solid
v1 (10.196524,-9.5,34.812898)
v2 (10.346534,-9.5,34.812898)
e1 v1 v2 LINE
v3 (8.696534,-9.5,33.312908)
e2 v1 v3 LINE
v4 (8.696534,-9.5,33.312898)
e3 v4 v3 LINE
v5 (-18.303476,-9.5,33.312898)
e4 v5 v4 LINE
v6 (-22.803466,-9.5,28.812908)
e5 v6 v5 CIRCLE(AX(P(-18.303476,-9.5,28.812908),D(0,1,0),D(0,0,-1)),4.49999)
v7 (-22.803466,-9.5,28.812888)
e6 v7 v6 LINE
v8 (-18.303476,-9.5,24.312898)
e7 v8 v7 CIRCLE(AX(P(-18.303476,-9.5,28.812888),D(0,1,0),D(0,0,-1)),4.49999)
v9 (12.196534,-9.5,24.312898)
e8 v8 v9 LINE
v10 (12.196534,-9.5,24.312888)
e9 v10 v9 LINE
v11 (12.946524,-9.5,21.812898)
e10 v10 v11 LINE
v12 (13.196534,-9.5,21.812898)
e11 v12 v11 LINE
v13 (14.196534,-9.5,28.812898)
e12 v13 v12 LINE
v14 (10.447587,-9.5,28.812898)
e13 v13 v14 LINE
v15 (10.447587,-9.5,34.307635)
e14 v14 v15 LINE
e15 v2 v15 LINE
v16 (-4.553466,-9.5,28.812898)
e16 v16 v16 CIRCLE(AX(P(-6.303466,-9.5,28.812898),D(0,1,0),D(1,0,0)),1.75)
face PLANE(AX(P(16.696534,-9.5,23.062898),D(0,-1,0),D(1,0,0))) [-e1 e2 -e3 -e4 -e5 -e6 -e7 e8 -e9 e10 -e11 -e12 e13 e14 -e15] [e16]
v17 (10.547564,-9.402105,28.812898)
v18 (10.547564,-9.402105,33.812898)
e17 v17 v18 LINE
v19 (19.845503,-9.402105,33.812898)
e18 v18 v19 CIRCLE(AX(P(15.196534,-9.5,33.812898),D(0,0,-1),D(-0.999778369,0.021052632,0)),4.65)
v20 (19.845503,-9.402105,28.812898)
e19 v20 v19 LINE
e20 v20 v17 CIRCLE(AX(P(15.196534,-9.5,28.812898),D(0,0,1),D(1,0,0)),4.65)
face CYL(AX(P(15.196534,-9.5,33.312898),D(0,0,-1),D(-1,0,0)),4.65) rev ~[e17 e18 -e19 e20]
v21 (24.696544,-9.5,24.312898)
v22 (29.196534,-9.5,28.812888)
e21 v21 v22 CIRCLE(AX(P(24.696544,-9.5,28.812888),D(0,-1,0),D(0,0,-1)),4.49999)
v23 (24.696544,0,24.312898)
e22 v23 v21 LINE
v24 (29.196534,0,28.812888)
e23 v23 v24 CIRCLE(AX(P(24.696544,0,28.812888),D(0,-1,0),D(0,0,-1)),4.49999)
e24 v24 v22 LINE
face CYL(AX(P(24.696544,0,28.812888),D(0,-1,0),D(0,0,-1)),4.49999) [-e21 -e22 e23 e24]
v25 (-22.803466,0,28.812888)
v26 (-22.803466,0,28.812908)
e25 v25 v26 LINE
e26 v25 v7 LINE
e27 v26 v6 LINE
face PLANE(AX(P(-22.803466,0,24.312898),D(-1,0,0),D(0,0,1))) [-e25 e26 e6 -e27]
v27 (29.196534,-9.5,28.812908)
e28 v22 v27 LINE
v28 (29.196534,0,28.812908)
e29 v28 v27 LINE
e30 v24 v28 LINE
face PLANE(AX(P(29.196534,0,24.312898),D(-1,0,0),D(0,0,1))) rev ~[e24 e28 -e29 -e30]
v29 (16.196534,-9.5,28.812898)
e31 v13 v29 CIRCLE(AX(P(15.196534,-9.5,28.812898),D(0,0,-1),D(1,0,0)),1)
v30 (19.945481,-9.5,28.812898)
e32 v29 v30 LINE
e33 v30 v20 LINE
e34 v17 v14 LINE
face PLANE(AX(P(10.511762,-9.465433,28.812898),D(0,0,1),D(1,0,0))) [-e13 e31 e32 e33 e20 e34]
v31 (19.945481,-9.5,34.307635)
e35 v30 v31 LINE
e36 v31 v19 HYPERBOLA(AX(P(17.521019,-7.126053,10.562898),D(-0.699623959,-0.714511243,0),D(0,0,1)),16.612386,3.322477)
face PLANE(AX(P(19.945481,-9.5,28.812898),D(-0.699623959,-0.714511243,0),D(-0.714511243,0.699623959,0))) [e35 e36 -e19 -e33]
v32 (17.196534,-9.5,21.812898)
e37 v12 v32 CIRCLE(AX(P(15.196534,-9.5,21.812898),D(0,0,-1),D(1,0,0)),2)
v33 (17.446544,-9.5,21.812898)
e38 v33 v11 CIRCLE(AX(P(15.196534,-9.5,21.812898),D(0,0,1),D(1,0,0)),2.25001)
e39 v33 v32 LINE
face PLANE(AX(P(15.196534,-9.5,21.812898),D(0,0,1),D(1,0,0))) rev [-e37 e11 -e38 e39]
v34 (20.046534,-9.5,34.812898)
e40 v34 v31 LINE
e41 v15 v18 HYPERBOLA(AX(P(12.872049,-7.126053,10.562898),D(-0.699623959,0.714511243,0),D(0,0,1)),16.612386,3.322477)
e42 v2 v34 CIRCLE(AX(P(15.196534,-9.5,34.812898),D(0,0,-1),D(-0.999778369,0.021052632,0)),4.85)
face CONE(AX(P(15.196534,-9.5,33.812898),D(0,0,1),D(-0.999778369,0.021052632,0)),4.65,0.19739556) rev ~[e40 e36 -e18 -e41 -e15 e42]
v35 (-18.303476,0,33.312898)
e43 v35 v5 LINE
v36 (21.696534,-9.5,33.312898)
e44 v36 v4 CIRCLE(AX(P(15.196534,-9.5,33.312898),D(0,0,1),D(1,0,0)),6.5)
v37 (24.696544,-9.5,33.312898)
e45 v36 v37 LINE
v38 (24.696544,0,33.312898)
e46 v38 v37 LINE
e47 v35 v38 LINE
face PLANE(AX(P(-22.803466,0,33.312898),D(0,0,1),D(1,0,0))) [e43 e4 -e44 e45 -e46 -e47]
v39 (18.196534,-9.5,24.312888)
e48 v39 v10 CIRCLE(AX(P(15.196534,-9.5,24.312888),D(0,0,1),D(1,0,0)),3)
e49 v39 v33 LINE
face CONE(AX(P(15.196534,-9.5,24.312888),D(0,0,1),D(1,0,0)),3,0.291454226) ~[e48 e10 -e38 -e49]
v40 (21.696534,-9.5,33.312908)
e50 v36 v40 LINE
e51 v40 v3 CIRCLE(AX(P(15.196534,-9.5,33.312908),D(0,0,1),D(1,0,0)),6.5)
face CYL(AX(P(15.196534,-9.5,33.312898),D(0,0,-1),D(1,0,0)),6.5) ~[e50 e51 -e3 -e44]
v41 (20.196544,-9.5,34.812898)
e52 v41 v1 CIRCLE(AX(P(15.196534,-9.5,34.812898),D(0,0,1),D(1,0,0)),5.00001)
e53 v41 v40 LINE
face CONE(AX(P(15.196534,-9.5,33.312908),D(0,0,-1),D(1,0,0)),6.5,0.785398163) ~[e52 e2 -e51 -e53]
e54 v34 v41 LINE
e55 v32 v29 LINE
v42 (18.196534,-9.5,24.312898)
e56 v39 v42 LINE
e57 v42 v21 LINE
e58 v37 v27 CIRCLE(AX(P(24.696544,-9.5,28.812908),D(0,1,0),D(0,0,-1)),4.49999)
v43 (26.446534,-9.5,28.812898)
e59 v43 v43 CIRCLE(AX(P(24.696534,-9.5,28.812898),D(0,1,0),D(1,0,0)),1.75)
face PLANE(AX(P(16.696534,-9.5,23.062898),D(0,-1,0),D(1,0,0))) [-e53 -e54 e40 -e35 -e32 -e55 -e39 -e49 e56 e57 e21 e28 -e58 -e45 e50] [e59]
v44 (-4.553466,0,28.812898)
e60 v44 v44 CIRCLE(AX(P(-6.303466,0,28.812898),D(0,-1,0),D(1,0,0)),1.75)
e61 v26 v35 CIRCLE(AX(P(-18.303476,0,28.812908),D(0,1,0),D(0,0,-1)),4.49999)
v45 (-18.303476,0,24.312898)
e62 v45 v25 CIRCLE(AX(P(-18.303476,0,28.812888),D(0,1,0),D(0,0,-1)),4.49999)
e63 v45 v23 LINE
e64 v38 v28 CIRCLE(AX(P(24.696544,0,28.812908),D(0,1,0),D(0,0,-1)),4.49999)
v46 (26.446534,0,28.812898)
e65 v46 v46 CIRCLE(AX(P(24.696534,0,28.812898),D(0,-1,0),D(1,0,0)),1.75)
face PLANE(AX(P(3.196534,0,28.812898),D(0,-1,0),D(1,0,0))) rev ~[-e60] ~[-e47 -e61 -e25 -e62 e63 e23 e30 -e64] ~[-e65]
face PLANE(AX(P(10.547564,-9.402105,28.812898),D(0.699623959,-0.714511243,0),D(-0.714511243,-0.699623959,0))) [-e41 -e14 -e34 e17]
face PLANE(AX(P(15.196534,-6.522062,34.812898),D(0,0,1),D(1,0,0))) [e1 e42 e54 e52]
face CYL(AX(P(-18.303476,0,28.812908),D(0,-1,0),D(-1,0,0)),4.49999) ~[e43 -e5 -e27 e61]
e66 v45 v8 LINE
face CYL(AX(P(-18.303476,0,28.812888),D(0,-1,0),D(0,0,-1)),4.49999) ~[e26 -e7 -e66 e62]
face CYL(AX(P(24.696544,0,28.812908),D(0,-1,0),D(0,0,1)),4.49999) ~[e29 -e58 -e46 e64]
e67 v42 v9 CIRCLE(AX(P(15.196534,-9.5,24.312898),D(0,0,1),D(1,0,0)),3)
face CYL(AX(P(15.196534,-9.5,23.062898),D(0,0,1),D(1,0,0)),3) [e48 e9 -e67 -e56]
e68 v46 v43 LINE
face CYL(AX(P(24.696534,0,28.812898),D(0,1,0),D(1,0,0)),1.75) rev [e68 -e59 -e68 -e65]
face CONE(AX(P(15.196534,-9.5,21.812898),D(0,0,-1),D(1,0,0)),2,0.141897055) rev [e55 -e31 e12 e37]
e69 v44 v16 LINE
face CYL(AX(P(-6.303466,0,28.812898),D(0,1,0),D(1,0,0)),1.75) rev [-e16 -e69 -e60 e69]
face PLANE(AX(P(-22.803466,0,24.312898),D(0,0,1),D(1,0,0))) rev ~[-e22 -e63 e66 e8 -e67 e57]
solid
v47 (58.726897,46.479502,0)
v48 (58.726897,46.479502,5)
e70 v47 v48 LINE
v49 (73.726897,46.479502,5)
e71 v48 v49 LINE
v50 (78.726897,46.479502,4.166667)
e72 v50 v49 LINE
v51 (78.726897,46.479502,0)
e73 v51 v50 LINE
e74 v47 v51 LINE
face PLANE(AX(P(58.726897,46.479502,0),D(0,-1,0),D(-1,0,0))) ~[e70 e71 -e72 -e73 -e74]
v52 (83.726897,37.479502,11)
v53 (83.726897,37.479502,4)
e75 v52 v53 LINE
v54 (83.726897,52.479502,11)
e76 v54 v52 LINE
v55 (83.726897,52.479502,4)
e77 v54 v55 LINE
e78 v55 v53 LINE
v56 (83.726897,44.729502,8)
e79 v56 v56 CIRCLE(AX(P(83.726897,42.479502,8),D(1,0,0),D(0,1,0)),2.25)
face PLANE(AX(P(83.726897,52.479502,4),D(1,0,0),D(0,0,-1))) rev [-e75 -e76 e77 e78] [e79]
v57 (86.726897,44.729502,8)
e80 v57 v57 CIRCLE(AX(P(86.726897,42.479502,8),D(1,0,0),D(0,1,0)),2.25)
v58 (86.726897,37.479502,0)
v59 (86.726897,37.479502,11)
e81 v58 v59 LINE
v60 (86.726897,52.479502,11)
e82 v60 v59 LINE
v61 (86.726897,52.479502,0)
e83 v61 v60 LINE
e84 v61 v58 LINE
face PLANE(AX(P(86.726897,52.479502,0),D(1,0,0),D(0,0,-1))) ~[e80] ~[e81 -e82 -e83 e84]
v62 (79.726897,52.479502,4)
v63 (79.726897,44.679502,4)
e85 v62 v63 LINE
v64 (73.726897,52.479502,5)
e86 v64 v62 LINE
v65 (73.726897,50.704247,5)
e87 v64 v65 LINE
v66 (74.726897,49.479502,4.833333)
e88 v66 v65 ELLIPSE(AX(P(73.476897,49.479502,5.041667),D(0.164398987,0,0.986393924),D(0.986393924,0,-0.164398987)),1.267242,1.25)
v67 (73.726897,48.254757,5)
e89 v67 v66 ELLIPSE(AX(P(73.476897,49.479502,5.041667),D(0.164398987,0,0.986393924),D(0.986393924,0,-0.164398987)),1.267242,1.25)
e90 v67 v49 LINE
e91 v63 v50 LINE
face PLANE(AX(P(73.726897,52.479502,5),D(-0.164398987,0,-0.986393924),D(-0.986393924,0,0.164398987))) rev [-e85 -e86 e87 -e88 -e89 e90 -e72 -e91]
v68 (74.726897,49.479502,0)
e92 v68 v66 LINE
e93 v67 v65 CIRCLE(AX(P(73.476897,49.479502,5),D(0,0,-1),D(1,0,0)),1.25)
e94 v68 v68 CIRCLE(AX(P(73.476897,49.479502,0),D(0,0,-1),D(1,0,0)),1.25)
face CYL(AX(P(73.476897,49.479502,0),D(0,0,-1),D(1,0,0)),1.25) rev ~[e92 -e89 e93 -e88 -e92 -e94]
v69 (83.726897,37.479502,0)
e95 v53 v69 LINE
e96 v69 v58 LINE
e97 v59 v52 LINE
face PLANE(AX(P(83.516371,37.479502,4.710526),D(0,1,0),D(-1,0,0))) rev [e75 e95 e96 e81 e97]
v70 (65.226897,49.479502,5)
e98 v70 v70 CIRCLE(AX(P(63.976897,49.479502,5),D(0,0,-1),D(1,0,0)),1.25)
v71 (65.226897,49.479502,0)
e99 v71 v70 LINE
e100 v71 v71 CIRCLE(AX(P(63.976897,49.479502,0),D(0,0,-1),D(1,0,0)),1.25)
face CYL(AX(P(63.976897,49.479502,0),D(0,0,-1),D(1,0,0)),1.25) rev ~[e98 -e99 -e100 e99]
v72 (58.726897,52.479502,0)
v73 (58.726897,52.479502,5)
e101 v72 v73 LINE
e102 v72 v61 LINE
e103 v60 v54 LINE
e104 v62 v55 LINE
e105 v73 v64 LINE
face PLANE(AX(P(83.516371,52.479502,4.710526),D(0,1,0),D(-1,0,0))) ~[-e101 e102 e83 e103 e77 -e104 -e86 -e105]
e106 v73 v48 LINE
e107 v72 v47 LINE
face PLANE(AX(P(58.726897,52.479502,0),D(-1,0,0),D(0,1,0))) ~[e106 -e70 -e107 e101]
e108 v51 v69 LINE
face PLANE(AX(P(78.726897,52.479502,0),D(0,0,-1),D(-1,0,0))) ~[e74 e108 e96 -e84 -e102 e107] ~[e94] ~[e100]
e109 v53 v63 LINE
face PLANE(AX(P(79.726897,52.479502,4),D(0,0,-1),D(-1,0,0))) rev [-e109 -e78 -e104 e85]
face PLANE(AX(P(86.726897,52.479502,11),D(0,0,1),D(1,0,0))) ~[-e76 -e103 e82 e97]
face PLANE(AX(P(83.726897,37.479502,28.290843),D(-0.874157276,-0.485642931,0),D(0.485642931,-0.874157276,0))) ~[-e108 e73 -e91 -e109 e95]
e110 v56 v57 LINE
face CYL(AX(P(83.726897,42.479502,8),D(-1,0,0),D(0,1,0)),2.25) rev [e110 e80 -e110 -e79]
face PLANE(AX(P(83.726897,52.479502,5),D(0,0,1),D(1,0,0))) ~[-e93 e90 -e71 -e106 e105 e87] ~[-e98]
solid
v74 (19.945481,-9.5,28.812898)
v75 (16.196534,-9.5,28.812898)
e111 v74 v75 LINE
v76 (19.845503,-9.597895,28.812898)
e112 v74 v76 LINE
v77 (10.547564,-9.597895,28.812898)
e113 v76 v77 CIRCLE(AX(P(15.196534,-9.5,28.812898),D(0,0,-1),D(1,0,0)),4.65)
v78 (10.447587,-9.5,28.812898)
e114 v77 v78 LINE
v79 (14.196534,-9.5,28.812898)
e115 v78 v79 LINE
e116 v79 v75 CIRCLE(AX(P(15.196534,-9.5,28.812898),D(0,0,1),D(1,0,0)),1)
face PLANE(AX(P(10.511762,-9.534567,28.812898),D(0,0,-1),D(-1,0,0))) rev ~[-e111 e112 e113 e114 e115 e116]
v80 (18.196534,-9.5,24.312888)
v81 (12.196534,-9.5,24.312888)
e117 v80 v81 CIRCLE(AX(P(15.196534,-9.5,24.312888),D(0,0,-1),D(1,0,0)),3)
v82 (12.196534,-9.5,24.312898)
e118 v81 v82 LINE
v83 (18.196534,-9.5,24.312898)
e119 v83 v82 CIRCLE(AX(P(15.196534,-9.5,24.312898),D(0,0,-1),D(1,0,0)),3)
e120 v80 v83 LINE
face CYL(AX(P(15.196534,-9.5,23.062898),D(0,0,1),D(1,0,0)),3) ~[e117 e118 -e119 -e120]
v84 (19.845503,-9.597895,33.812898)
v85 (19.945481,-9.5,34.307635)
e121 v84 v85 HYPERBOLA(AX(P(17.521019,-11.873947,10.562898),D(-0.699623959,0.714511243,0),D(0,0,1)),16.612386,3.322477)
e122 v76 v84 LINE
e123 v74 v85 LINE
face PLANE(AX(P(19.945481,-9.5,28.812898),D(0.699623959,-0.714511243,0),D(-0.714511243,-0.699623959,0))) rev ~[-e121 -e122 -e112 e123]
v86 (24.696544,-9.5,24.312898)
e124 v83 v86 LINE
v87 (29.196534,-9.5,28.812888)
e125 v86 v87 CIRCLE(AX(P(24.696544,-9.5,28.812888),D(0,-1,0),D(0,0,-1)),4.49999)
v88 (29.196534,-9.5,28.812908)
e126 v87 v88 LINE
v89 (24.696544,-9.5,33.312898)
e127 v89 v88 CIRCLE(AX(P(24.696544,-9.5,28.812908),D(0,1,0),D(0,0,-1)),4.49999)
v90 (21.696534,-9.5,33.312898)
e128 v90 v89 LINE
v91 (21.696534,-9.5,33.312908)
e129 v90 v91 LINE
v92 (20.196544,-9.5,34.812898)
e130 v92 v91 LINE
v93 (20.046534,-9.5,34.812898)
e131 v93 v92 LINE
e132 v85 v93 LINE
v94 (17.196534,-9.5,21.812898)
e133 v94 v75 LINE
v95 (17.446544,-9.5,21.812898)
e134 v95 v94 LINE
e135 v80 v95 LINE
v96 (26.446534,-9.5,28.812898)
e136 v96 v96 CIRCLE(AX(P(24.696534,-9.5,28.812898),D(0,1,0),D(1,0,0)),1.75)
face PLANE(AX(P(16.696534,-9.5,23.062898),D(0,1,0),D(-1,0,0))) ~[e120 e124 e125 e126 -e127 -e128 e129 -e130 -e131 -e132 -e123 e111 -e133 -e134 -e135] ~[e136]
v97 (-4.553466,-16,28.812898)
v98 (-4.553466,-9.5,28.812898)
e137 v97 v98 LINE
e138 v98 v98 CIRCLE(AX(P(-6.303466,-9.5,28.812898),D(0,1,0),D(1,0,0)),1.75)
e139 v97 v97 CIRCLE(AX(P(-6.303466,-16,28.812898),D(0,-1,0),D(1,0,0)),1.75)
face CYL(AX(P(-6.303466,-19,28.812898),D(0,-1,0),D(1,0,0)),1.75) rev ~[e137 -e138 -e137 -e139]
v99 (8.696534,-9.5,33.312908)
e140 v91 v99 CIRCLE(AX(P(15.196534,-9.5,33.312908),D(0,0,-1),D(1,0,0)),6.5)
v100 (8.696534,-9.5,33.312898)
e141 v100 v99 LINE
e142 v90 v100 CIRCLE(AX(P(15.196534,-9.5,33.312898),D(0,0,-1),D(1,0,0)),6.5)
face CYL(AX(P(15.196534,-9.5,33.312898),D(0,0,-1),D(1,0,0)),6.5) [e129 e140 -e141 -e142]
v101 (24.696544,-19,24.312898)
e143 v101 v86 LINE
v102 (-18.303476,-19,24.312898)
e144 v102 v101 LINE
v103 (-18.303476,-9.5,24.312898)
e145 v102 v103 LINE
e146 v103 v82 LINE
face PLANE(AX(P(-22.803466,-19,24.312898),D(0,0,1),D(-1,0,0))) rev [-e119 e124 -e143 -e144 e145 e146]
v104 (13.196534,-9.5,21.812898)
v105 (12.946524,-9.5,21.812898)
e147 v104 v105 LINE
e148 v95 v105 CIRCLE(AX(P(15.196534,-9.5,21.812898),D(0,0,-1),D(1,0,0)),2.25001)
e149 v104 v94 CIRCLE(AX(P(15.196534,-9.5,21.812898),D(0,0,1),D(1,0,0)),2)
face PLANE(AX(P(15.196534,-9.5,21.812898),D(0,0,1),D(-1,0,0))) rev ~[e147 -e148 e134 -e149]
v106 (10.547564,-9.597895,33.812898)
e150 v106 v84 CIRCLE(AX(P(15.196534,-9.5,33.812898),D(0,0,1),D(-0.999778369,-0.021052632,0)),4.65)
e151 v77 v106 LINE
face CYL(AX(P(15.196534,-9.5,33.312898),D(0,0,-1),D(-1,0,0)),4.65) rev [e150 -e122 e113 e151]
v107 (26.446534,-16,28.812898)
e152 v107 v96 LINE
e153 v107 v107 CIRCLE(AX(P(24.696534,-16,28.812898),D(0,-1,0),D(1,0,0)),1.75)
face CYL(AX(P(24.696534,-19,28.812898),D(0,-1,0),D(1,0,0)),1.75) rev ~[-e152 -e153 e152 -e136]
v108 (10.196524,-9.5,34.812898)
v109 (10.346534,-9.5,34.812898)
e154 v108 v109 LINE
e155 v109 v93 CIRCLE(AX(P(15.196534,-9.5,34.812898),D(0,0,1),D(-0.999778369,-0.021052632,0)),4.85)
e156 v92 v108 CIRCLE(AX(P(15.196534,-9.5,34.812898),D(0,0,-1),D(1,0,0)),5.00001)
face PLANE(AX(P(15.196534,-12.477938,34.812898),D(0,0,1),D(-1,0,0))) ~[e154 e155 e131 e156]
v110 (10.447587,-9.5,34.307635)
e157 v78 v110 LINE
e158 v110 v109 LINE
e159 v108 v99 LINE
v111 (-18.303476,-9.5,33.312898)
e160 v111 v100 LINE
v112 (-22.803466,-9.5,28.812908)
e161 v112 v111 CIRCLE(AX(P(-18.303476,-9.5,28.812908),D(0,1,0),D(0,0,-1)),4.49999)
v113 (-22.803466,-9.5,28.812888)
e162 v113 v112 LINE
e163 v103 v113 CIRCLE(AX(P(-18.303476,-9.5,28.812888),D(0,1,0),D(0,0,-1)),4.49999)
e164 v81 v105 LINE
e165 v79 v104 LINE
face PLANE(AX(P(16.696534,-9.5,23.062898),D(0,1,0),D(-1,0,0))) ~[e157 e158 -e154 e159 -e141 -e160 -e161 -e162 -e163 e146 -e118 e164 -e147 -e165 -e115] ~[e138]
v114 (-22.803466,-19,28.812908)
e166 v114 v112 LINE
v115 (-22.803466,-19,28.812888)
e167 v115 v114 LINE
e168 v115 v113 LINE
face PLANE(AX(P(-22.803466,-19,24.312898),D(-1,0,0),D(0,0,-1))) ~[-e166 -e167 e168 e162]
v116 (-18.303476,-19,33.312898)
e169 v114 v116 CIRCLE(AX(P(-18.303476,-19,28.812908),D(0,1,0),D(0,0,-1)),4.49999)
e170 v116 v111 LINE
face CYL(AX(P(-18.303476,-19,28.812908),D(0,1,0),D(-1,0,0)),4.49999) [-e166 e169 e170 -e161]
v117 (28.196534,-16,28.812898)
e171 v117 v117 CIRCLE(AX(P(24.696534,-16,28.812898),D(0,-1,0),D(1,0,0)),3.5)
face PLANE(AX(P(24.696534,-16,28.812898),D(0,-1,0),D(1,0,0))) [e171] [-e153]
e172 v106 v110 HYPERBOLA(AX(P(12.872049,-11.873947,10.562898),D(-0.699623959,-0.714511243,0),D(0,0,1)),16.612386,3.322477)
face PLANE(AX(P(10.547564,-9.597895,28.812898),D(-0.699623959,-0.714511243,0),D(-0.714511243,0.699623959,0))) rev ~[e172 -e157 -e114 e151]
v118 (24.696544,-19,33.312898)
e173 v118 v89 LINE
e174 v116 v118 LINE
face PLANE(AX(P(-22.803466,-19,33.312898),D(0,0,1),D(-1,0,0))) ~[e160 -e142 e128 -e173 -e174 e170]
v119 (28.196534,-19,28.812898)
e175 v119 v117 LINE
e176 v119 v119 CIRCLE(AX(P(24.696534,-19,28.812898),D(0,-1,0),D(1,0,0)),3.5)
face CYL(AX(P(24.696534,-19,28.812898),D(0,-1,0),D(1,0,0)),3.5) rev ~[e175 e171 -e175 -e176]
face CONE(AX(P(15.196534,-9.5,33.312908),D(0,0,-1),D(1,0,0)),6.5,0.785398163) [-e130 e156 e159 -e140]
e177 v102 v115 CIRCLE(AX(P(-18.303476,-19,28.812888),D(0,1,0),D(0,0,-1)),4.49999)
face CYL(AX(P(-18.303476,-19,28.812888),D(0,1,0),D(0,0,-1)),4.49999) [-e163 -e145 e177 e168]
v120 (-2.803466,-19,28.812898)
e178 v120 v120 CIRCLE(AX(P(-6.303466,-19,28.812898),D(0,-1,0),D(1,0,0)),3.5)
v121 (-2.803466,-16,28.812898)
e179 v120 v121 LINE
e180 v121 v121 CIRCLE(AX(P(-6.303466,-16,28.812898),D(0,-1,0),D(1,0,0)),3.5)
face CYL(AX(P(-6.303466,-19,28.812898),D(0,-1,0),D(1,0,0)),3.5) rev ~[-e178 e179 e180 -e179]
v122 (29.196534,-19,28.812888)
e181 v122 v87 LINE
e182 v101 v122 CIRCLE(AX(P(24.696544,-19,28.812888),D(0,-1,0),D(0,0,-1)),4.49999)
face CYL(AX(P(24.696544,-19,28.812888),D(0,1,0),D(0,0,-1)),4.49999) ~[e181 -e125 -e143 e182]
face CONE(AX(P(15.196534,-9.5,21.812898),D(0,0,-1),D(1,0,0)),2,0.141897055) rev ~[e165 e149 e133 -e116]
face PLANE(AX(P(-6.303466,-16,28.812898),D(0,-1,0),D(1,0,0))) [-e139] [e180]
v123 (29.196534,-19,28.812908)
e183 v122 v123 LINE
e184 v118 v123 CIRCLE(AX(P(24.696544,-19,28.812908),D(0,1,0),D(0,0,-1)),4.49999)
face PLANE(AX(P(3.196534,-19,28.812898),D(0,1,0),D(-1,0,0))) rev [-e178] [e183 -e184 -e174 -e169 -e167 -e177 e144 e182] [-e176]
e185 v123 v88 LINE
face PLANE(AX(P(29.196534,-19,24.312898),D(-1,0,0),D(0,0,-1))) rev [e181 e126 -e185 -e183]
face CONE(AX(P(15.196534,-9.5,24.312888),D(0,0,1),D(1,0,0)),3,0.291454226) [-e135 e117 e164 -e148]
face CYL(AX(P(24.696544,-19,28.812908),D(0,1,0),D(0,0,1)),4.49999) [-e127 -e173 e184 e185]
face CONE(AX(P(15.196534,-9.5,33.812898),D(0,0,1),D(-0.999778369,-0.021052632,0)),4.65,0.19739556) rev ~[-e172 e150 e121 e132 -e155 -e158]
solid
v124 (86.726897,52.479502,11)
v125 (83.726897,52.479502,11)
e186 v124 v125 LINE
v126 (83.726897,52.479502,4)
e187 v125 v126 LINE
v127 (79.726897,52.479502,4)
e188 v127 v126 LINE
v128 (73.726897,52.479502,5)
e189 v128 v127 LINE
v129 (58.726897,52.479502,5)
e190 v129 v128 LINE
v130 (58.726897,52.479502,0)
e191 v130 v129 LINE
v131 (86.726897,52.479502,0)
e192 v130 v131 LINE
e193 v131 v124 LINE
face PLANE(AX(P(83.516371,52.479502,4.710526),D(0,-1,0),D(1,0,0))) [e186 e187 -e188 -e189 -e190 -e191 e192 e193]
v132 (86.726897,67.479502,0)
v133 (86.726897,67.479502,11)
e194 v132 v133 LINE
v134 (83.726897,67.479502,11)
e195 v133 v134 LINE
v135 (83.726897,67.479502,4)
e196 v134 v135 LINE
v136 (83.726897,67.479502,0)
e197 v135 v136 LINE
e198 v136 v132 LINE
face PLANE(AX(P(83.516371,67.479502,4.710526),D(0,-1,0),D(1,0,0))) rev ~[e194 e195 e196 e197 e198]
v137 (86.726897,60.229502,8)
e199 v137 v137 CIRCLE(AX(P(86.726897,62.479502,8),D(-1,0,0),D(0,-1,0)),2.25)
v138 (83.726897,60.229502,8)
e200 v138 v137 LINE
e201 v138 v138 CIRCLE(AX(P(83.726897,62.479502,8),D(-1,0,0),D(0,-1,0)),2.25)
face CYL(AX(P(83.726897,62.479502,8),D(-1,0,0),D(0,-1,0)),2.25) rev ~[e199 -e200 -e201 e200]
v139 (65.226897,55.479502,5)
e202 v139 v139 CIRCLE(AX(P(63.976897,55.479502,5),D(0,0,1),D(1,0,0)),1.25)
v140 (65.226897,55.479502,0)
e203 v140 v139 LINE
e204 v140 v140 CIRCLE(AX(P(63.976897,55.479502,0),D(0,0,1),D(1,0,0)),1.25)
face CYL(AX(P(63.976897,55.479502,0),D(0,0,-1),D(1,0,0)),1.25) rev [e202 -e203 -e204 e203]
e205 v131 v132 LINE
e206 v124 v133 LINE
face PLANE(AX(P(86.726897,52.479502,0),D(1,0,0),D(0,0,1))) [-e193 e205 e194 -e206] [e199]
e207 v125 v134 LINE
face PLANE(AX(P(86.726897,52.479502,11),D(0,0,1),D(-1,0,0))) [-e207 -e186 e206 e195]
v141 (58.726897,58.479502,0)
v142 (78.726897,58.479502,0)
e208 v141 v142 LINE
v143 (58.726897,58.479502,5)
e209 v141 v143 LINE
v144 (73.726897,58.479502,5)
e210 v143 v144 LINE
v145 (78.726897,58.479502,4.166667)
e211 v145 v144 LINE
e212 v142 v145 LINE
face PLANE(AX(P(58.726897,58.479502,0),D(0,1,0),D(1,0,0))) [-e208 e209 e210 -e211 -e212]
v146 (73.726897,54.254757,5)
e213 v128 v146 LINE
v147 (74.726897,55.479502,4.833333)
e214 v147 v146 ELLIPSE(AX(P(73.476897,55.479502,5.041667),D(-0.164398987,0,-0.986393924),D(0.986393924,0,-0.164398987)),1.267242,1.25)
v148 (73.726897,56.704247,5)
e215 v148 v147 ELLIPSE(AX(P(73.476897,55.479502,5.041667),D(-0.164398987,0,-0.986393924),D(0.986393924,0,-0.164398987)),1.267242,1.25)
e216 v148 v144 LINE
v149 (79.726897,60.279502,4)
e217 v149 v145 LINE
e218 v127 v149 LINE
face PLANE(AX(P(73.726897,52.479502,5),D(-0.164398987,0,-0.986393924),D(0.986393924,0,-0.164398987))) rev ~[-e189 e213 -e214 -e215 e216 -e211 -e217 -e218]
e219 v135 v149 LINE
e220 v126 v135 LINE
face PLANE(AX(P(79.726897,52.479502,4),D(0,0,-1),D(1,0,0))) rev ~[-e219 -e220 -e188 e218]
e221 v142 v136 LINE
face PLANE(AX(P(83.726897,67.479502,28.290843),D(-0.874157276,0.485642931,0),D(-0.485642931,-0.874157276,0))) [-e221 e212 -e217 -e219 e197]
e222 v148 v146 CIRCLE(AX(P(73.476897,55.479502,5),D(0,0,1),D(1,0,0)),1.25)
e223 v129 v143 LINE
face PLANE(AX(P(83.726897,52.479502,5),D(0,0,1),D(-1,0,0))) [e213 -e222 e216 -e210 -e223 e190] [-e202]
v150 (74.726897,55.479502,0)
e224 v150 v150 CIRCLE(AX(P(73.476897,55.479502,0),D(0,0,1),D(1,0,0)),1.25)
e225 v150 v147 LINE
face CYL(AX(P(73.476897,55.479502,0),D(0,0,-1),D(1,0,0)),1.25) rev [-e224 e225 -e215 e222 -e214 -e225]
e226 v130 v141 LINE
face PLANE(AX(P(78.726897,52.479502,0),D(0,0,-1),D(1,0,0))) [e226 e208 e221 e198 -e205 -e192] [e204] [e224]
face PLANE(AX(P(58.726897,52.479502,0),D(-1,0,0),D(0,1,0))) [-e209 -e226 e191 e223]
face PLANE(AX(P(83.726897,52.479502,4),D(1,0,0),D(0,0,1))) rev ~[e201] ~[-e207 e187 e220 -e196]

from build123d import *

# Parameters (mm, degrees)
F0_W           = 52
F0_H           = 9
F1_DEPTH       = 9.5
F3_DEPTH       = 4.5
F4_DEPTH       = 1.5
F5_SIZE        = 1.49999
F6_W           = 3
F6_H           = 2.5
F7_ANGLE       = 180
F10_SIZE2      = 0.74999
F10_SIZE       = 2.49999
F11_R          = 1.75
F12_DEPTH      = 42.06082
F13_R          = 4.49999
F15_R          = 3.5
F15_R_2        = 1.75
F16_DEPTH      = 3
F17_W          = 20
F17_H          = 6
F17_R          = 1.25
F18_DEPTH      = 5
F20_DEPTH      = 15
F21_T4_DEPTH   = 51.5816860873
F22_R          = 2.25
F23_DEPTH      = 25
F25_DEPTH      = 25
F27_T1_DEPTH   = 6.2546093825
F27_2_T1_DEPTH = 6.2546093825
F28_SIZE2      = 0.2
F28_SIZE       = 1
F29_SIZE2      = 1
F29_SIZE       = 0.2


# Not quite as in the source:
# - a fillet or chamfer that OpenCascade refuses, or shapes differently, is made with other operations: its cross-section is extruded or revolved along the edge and cut away or added
# - a fillet or chamfer is up to 0.001 mm smaller than in the source, because OpenCascade refuses the exact size


with BuildPart() as f1:
    # F0 (on Front) → F1 (new body)
    with BuildSketch(Plane.XZ):
        with Locations((3.196533835, 28.8128983229)):
            Rectangle(F0_W, F0_H)
    extrude(amount=F1_DEPTH)

    # F2 (on face) → F3 (cut)
    with BuildSketch(Plane.XY.offset(33.3128983229)):
        with BuildLine():
            Line((10.546533835, -9.5), (19.846533835, -9.5))
            ThreePointArc((19.846533835, -9.5), (15.196533835, -4.85), (10.546533835, -9.5))
        make_face()
    extrude(amount=-F3_DEPTH, mode=Mode.SUBTRACT)

    # F2 (on face) → F4 (join)
    with BuildSketch(Plane.XY.offset(33.3128983229)):
        with BuildLine():
            ThreePointArc((10.546533835, -9.5), (15.196533835, -4.85), (19.846533835, -9.5))
            Line((19.846533835, -9.5), (21.696533835, -9.5))
            ThreePointArc((21.696533835, -9.5), (15.196533835, -3), (8.696533835, -9.5))
            Line((8.696533835, -9.5), (10.546533835, -9.5))
        make_face()
    extrude(amount=F4_DEPTH)

    # F5 (size 1.5 in the source; OpenCascade refuses exactly that, so slightly less here)
    f5_edges = [f1.edges().sort_by_distance(p)[0] for p in [
        (15.196534, -3, 34.812898),
    ]]
    chamfer(f5_edges, length=F5_SIZE)

    # F6 (on face) → F7 (revolve)
    with BuildSketch(Plane.XZ.offset(9.5)):
        with Locations((16.696533835, 23.0628983229)):
            Rectangle(F6_W, F6_H)
        Polygon((16.196533835, 28.8128983229), (15.196533835, 28.8128983229), (15.196533835, 24.3128983229), (18.196533835, 24.3128983229), align=None)
    revolve(axis=Axis((15.196533835, -9.5, 25.3128983229), (0, 0, 1)), revolution_arc=F7_ANGLE)

    # F8 (on face) → F9 (revolve, cut)
    with BuildSketch(Plane.XZ.offset(9.5)):
        Polygon((16.196533835, 28.8128983229), (15.196533835, 28.8128983229), (15.196533835, 21.8128983229), (17.196533835, 21.8128983229), align=None)
    revolve(axis=Axis((15.196533835, -9.5, 25.3128983229), (0, 0, -1)), mode=Mode.SUBTRACT)

    # F10 (size 2.5 and 0.75 in the source; OpenCascade refuses exactly that, so slightly less here)
    f10_edges = [f1.edges().sort_by_distance(p)[0] for p in [
        (15.196534, -6.5, 21.812898),
    ]]
    f10_side = f1.faces().sort_by_distance((15.196534, -6.5, 23.062898))[0]
    chamfer(f10_edges, length=F10_SIZE, length2=F10_SIZE2, reference=f10_side)

    # F11 (on Front) → F12 (cut)
    with BuildSketch(Plane.XZ):
        with Locations((24.696533835, 28.8128983229)):
            Circle(F11_R)
        with Locations((-6.303466165, 28.8128983229)):
            Circle(F11_R)
    extrude(amount=F12_DEPTH, mode=Mode.SUBTRACT)

    # F13 (radius 4.5 in the source; OpenCascade refuses exactly that, so slightly less here)
    f13_edges = [f1.edges().sort_by_distance(p)[0] for p in [
        (29.196534, -4.75, 33.312898),
        (29.196534, -4.75, 24.312898),
        (-22.803466, -4.75, 33.312898),
        (-22.803466, -4.75, 24.312898),
    ]]
    fillet(f13_edges, radius=F13_R)


with BuildPart() as f14_1:
    # F14: instance of F1
    add(f1.part.mirror(Plane(origin=(-4.5395011787, -9.5, 28.6957157719), x_dir=(1, 0, 0), z_dir=(0, -1, 0))))

    # F15 (on face) → F16 (cut)
    with BuildSketch(Plane.XZ.offset(19)):
        with Locations((-6.303466165, 28.8128983229)):
            Circle(F15_R)
        with Locations((-6.303466165, 28.8128983229)):
            Circle(F15_R_2, mode=Mode.SUBTRACT)
        with Locations((24.696533835, 28.8128983229)):
            Circle(F15_R)
        with Locations((24.696533835, 28.8128983229)):
            Circle(F15_R_2, mode=Mode.SUBTRACT)
    extrude(amount=-F16_DEPTH, mode=Mode.SUBTRACT)

    # F27: chamfer of 0.1 on 2 edges, made by hand

    # F27_s2 → F27_t1 (cut)
    with BuildSketch(Plane.XY.offset(28.8128983229)):
        with BuildLine():
            Line((10.5475644201, -9.5978947368), (10.4475865832, -9.5))
            Line((10.4475865832, -9.5), (10.546533835, -9.5))
            ThreePointArc((10.546533835, -9.5), (10.5468065962, -9.5503647222), (10.5475644201, -9.5978947368))
        make_face()
        with BuildLine():
            Line((19.9454810868, -9.5), (19.8455032499, -9.5978947368))
            ThreePointArc((19.8455032499, -9.5978947368), (19.8462610737, -9.5503647222), (19.846533835, -9.5))
            Line((19.846533835, -9.5), (19.9454810868, -9.5))
        make_face()
    extrude(amount=F27_T1_DEPTH, mode=Mode.SUBTRACT)

    # F28
    f28_edges = [f14_1.edges().sort_by_distance(p)[0] for p in [
        (15.196534, -14.15, 34.812898),
    ]]
    f28_side = f14_1.faces().sort_by_distance((15.196534, -14.15, 31.812898))[0]
    chamfer(f28_edges, length=F28_SIZE, length2=F28_SIZE2, reference=f28_side)


with BuildPart() as f18:
    # F17 (on Top) → F18 (new body)
    with BuildSketch(Plane.XY):
        with Locations((68.7268972397, 55.4795021277)):
            Rectangle(F17_W, F17_H)
        with Locations((63.9768972397, 55.4795021277)):
            Circle(F17_R, mode=Mode.SUBTRACT)
        with Locations((73.4768972397, 55.4795021277)):
            Circle(F17_R, mode=Mode.SUBTRACT)
    extrude(amount=F18_DEPTH)

    # F19 (on face) → F20 (join)
    with BuildSketch(Plane.XZ.offset(-52.4795021277)):
        Polygon((83.7268972397, 5), (78.7268972397, 5), (78.7268972397, 0), (86.7268972397, 0), (86.7268972397, 11), (83.7268972397, 11), align=None)
    extrude(amount=-F20_DEPTH)

    # F21: chamfer of 9 x 5 on 1 edges, made by hand


with BuildPart() as f21_tool2:
    # F21_s3 → F21_t4 (new body)
    with BuildSketch(Plane.XY.offset(28.2908430436)):
        Polygon((83.7268972397, 67.4795021277), (78.7268972397, 58.4795021277), (78.7268972397, 67.4795021277), align=None)
    extrude(amount=-F21_T4_DEPTH)

    split(bisect_by=Plane.XZ.offset(-58.4795021277), keep=Keep.BOTTOM)


with BuildPart() as f18_1:
    add(f18.part)

    # F21_t1: cut F21_tool2
    add(f21_tool2.part, mode=Mode.SUBTRACT)

    # F22 (on face) → F23 (cut)
    with BuildSketch(Plane(origin=(83.7268972397, 0, 0), x_dir=(0, -1, 0), z_dir=(-1, 0, 0))):
        with Locations((-62.4795021277, 8)):
            Circle(F22_R)
    extrude(amount=-F23_DEPTH, mode=Mode.SUBTRACT)

    # F24 (on face) → F25 (cut)
    with BuildSketch(Plane.XZ.offset(-52.4795021277)):
        Polygon((83.7268972397, 4), (83.7268972397, 5), (73.7268972397, 5), (79.7268972397, 4), align=None)
    extrude(amount=-F25_DEPTH, mode=Mode.SUBTRACT)


with BuildPart() as f26_1:
    # F26: instance of F18
    add(f18_1.part.mirror(Plane(origin=(73.8792151205, 52.4795021277, 3.059602649), x_dir=(1, 0, 0), z_dir=(0, -1, 0))))


with BuildPart() as f1_1:
    add(f1.part)

    # F27#2: chamfer of 0.1 on 2 edges, made by hand

    # F27_2_s2 → F27_2_t1 (cut)
    with BuildSketch(Plane.XY.offset(28.8128983229)):
        with BuildLine():
            Line((10.5475644201, -9.4021052632), (10.4475865832, -9.5))
            Line((10.4475865832, -9.5), (10.546533835, -9.5))
            ThreePointArc((10.546533835, -9.5), (10.5468065962, -9.4496352778), (10.5475644201, -9.4021052632))
        make_face()
        with BuildLine():
            Line((19.9454810868, -9.5), (19.8455032499, -9.4021052632))
            ThreePointArc((19.8455032499, -9.4021052632), (19.8462610737, -9.4496352778), (19.846533835, -9.5))
            Line((19.846533835, -9.5), (19.9454810868, -9.5))
        make_face()
    extrude(amount=F27_2_T1_DEPTH, mode=Mode.SUBTRACT)

    # F29
    f29_edges = [f1_1.edges().sort_by_distance(p)[0] for p in [
        (15.196534, -4.85, 34.812898),
    ]]
    f29_side = f1_1.faces().sort_by_distance((15.196534, -4.611794, 34.812898))[0]
    chamfer(f29_edges, length=F29_SIZE, length2=F29_SIZE2, reference=f29_side)


solid = Compound([f14_1.part, f18_1.part, f26_1.part, f1_1.part])
